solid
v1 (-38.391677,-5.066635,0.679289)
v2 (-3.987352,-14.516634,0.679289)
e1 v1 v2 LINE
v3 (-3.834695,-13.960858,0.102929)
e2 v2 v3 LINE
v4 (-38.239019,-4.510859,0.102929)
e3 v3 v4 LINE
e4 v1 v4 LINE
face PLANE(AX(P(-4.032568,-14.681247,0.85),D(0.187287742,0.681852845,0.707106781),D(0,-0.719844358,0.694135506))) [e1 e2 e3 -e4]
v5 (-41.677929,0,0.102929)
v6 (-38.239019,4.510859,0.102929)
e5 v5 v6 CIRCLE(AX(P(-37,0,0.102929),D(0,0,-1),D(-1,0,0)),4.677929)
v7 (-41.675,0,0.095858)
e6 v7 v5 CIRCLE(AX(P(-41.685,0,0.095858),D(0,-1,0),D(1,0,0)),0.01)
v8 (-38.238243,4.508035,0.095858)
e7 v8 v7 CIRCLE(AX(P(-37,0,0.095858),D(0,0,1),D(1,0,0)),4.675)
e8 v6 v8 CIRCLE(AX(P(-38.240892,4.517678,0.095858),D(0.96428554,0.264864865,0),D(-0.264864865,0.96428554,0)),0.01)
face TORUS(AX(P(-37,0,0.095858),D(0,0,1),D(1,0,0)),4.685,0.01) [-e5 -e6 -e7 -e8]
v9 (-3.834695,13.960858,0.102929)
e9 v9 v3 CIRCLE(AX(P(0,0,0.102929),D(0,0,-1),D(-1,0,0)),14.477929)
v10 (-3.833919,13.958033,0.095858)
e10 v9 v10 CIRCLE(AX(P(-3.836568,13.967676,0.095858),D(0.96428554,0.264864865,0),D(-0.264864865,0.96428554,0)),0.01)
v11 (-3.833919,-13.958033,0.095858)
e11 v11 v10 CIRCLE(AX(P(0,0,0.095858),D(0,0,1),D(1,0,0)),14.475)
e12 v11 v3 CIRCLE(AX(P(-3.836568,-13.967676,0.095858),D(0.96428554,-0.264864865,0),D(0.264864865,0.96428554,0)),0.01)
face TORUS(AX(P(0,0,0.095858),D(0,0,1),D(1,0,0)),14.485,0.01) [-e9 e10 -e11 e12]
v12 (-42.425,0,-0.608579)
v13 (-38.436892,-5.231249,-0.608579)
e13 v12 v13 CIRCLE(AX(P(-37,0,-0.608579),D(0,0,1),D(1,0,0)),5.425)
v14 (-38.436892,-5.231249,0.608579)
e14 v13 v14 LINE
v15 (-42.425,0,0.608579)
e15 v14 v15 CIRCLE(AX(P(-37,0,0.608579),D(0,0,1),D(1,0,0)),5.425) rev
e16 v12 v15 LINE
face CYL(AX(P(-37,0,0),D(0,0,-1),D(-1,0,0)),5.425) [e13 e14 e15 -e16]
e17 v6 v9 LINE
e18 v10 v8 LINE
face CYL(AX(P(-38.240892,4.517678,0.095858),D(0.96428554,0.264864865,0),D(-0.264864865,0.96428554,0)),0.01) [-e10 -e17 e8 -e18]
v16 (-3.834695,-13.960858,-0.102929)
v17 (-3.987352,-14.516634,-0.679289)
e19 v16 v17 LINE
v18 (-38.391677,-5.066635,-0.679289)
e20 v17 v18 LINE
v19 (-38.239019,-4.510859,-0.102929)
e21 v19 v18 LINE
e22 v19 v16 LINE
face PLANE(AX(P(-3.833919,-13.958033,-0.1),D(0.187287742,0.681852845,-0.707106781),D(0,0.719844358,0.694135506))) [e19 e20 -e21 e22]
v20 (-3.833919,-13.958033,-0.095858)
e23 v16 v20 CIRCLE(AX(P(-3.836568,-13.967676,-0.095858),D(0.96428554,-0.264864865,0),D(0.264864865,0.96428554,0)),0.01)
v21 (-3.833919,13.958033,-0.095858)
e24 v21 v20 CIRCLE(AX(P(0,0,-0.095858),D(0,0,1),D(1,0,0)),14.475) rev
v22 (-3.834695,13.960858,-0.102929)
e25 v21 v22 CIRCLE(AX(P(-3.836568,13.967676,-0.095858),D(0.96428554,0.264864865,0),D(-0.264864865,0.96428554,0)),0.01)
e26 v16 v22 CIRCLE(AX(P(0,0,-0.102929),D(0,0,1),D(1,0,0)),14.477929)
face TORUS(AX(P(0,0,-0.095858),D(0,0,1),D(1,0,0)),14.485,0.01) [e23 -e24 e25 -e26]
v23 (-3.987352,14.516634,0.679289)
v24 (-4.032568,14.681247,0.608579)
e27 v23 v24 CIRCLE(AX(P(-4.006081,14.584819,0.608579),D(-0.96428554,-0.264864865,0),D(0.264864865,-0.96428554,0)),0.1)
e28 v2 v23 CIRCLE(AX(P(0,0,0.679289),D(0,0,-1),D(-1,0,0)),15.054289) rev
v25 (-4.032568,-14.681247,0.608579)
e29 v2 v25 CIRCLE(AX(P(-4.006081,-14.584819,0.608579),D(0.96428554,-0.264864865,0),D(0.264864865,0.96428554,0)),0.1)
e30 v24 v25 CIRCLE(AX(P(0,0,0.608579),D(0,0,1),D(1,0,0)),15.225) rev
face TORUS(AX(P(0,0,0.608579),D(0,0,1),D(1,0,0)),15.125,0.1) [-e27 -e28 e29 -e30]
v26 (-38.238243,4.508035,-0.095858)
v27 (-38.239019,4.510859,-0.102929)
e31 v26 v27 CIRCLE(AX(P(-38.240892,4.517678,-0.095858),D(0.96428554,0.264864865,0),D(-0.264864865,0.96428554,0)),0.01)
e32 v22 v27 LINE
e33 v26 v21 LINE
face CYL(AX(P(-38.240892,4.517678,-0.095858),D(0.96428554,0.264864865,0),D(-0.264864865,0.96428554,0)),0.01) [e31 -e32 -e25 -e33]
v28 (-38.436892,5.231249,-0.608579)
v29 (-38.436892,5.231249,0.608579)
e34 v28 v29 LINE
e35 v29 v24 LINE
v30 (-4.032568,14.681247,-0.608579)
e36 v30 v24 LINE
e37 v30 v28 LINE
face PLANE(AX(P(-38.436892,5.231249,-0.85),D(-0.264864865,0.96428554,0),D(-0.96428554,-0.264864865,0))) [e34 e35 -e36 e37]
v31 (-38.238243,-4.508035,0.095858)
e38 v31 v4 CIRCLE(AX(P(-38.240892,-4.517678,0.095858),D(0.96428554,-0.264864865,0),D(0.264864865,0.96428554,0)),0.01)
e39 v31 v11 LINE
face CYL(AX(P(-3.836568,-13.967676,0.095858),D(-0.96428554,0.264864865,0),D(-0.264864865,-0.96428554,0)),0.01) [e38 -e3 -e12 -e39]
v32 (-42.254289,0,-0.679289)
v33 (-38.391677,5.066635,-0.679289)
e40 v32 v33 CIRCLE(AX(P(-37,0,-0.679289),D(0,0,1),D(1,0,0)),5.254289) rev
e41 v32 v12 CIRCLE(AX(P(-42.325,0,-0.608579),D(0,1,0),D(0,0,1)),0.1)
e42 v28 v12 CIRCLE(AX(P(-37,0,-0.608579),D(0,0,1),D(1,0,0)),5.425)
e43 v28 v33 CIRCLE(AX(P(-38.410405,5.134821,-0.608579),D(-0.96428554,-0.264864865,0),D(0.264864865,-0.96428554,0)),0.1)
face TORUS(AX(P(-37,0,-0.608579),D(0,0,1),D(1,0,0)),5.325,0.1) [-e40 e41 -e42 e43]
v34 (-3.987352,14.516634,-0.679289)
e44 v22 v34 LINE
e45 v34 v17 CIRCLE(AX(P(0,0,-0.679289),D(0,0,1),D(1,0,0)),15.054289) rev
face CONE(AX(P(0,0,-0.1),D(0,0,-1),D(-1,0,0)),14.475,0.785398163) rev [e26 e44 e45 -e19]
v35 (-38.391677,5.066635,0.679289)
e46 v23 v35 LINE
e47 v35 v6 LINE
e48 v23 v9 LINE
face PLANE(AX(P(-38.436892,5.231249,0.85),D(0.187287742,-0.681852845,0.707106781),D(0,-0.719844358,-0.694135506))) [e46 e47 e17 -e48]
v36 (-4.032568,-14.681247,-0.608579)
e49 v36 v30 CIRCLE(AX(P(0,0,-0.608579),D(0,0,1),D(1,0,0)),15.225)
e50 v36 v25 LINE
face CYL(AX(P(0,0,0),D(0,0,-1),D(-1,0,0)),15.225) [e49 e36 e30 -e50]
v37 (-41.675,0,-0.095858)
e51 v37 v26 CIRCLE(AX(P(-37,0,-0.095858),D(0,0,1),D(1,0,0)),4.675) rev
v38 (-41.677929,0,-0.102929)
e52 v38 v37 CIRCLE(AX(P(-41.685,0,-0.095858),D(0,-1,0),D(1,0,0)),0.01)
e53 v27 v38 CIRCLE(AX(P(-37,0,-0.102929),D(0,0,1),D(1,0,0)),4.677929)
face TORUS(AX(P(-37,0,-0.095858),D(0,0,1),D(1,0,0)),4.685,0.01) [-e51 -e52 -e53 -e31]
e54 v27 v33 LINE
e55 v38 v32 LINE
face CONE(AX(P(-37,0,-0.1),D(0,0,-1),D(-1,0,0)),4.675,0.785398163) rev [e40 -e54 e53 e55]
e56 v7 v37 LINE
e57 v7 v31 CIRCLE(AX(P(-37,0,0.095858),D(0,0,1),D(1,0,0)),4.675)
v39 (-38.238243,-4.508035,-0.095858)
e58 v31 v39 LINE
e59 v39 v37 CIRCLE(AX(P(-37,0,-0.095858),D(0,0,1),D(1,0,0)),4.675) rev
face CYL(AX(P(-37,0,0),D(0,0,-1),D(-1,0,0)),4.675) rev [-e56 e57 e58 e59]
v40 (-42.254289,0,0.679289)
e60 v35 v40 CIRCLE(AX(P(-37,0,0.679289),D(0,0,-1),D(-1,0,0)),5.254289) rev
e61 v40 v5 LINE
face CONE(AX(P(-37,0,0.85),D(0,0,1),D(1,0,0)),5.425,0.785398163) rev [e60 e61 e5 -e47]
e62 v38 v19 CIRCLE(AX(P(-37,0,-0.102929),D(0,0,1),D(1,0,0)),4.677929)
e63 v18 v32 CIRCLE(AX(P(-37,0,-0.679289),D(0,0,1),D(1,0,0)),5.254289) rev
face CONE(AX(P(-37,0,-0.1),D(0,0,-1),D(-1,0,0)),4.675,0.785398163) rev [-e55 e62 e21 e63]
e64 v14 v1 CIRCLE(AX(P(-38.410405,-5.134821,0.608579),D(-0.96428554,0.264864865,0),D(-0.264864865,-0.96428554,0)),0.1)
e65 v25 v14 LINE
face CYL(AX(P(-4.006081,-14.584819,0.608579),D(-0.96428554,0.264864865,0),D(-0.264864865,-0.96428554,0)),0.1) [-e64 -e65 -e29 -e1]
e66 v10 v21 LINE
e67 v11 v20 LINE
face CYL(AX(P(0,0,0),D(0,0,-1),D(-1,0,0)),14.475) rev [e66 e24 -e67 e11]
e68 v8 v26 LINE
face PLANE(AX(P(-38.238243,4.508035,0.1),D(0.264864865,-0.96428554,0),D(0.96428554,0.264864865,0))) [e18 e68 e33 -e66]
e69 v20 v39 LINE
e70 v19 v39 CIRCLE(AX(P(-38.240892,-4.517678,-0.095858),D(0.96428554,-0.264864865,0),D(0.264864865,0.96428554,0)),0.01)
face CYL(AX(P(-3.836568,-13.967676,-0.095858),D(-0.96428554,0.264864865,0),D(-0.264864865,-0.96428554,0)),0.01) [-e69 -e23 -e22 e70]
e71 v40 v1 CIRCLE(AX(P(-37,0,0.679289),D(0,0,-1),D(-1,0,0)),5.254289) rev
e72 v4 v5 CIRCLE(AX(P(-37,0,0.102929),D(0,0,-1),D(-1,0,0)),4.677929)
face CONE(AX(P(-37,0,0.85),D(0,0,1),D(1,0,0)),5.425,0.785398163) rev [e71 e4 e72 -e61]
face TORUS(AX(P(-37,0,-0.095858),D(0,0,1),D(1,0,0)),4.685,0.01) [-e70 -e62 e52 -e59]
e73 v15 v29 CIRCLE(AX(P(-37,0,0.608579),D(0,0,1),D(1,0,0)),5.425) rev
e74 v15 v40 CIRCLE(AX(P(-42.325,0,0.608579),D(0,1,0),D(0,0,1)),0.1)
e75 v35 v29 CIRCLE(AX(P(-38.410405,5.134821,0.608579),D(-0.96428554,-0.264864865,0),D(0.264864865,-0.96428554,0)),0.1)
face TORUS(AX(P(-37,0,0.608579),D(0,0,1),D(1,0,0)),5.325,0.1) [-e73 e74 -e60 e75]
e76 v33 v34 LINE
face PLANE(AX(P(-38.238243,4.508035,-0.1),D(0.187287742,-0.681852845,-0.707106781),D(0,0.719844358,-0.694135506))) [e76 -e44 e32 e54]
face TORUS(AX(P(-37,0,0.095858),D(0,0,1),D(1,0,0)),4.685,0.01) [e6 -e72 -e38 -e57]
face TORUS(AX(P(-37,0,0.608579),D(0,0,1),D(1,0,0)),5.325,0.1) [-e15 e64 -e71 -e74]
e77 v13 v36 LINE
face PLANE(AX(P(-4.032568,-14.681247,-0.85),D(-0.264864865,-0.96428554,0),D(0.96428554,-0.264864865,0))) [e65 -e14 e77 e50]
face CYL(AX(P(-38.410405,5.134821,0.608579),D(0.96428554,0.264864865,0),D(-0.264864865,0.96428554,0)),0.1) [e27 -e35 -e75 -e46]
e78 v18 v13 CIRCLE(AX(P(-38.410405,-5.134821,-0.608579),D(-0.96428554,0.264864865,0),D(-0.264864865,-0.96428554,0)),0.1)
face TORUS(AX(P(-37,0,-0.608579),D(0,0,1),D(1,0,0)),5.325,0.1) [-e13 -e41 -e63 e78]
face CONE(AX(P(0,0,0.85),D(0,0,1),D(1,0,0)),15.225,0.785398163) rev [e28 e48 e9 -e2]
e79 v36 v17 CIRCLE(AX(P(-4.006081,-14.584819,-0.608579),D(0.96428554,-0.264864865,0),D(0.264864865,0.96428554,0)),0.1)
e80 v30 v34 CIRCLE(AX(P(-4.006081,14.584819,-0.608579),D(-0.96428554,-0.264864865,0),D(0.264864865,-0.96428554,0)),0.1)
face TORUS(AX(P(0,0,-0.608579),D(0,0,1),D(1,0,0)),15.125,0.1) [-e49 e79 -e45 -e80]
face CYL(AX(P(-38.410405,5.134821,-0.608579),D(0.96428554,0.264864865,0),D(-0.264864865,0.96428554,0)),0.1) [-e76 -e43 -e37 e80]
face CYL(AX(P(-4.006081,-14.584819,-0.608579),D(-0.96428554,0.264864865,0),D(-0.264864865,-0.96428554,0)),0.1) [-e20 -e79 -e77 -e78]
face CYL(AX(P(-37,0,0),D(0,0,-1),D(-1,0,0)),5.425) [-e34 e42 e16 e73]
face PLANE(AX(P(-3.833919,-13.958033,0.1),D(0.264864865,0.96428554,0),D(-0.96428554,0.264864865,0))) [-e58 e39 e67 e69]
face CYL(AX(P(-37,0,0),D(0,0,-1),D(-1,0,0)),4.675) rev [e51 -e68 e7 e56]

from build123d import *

# Parameters (mm, degrees)
FILLET1_R = 0.1
FILLET2_R = 0.01


with BuildPart() as part:
    # Sweep1: sweep along a path in Sketch2
    with BuildLine(Plane.XY) as sweep1_path:
        Line((-38.238243243, 4.508034901), (-3.833918919, 13.958033197))
        ThreePointArc((-3.833918919, 13.958033197), (14.475, 0), (-3.833918919, -13.958033197))
        Line((-3.833918919, -13.958033197), (-38.238243243, -4.508034901))
        ThreePointArc((-38.238243243, -4.508034901), (-41.675, 0), (-38.238243243, 4.508034901))
    # Sketch3 → Sweep1 (sweep)
    with BuildSketch(Plane(origin=(0, 0, 0), x_dir=(1, 0, 0), z_dir=(0, 1, 0))):
        Polygon((-42.425, 0.85), (-42.425, -0.85), (-41.675, -0.1), (-41.675, 0.1), align=None)
    sweep(path=sweep1_path.line)

    # Fillet1
    fillet1_edges = [part.edges().sort_by_distance(p)[0] for p in [
        (-21.23472973, -9.956248204, -0.85),
        (-21.23472973, -9.956248204, 0.85),
        (-42.425, 0, -0.85),
        (-42.425, 0, 0.85),
        (-42.425, 0, -0.85),
        (-42.425, 0, 0.85),
        (-21.23472973, 9.956248204, -0.85),
        (-21.23472973, 9.956248204, 0.85),
        (15.225, 0, -0.85),
        (15.225, 0, 0.85),
    ]]
    fillet(fillet1_edges, radius=FILLET1_R)

    # Fillet2
    # the kernel refuses this fillet: 0.01 mm, written as the material it takes off along each edge
    with BuildSketch(Plane(origin=(-3.833918919, -13.958033197, 0.1), x_dir=(-0.18728774204254256, -0.6818528445936296, 0.707106781186676), z_dir=(-0.9642855403669122, 0.26486486486374966, 9.376666110227916e-13)), Plane(origin=(-38.238243243, 4.508034901, 0.1), x_dir=(-0.18728774204547696, 0.681852844593033, 0.7071067811864742), z_dir=(0.9642855403662898, 0.26486486486601535, 9.378886556277166e-13))) as fillet2_piece_1:
        with BuildLine():
            CenterArc((FILLET2_R * 0.414213562373, -FILLET2_R), FILLET2_R, 90, 45)
            Line((-FILLET2_R * 0.292893218814, -FILLET2_R * 0.292893218813), (0, 0))
            Line((0, 0), (FILLET2_R * 0.414213562373, 0))
        make_face()
    extrude(amount=35.678564994, mode=Mode.SUBTRACT)
    with BuildSketch(Plane(origin=(-37, 0, -0.1), x_dir=(-0.26486486486465444, -0.9642855403666637, 0), z_dir=(0.9642855403666637, -0.26486486486465444, 0))) as fillet2_piece_2:
        with BuildLine():
            CenterArc((4.675 + FILLET2_R, -FILLET2_R * 0.414213562373), FILLET2_R, 135, 45)
            Line((4.675, -FILLET2_R * 0.414213562373), (4.675, 0))
            Line((4.675, 0), (4.675 + FILLET2_R * 0.292893218813, FILLET2_R * 0.292893218813))
        make_face()
    revolve(axis=Axis((-37, 0, -0.1), (0, 0, -1)), revolution_arc=149.282153594, mode=Mode.SUBTRACT)
    with BuildSketch(Plane(origin=(-37, 0, 0.1), x_dir=(-0.264864864864405, -0.9642855403667321, 0), z_dir=(0.9642855403667321, -0.264864864864405, 0))) as fillet2_piece_3:
        with BuildLine():
            CenterArc((4.675 + FILLET2_R, FILLET2_R * 0.414213562373), FILLET2_R, 180, 45)
            Line((4.675, FILLET2_R * 0.414213562373), (4.675, 0))
            Line((4.675, 0), (4.675 + FILLET2_R * 0.292893218813, -FILLET2_R * 0.292893218814))
        make_face()
    revolve(axis=Axis((-37, 0, 0.1), (0, 0, -1)), revolution_arc=149.282153594, mode=Mode.SUBTRACT)
    with BuildSketch(Plane(origin=(-38.238243243, 4.508034901, -0.1), x_dir=(-0.18728774204415874, 0.6818528445932414, -0.7071067811866223), z_dir=(0.9642855403665382, 0.264864864865111, 0)), Plane(origin=(-3.833918919, -13.958033197, -0.1), x_dir=(-0.1872877420438419, -0.6818528445933534, -0.7071067811865981), z_dir=(-0.9642855403666637, 0.2648648648646539, 0))) as fillet2_piece_4:
        with BuildLine():
            CenterArc((FILLET2_R * 0.414213562373, FILLET2_R), FILLET2_R, 225, 45)
            Line((-FILLET2_R * 0.292893218813, FILLET2_R * 0.292893218813), (0, 0))
            Line((0, 0), (FILLET2_R * 0.414213562373, 0))
        make_face()
    extrude(amount=35.678564994, mode=Mode.SUBTRACT)
    with BuildSketch(Plane(origin=(0, 0, -0.1), x_dir=(-0.2648648648651112, 0.9642855403665381, 0), z_dir=(-0.9642855403665381, -0.2648648648651112, 0))) as fillet2_piece_5:
        with BuildLine():
            CenterArc((14.475 + FILLET2_R, -FILLET2_R * 0.414213562373), FILLET2_R, 135, 45)
            Line((14.475, -FILLET2_R * 0.414213562373), (14.475, 0))
            Line((14.475, 0), (14.475 + FILLET2_R * 0.292893218814, FILLET2_R * 0.292893218813))
        make_face()
    revolve(axis=Axis((0, 0, -0.1), (0, 0, -1)), revolution_arc=210.717846406, mode=Mode.SUBTRACT)
    with BuildSketch(Plane(origin=(0, 0, 0.1), x_dir=(-0.2648648648652003, 0.9642855403665136, 0), z_dir=(-0.9642855403665136, -0.2648648648652003, 0))) as fillet2_piece_6:
        with BuildLine():
            CenterArc((14.475 + FILLET2_R, FILLET2_R * 0.414213562373), FILLET2_R, 180, 45)
            Line((14.475, FILLET2_R * 0.414213562373), (14.475, 0))
            Line((14.475, 0), (14.475 + FILLET2_R * 0.292893218814, -FILLET2_R * 0.292893218814))
        make_face()
    revolve(axis=Axis((0, 0, 0.1), (0, 0, -1)), revolution_arc=210.717846406, mode=Mode.SUBTRACT)


solid = part.part
